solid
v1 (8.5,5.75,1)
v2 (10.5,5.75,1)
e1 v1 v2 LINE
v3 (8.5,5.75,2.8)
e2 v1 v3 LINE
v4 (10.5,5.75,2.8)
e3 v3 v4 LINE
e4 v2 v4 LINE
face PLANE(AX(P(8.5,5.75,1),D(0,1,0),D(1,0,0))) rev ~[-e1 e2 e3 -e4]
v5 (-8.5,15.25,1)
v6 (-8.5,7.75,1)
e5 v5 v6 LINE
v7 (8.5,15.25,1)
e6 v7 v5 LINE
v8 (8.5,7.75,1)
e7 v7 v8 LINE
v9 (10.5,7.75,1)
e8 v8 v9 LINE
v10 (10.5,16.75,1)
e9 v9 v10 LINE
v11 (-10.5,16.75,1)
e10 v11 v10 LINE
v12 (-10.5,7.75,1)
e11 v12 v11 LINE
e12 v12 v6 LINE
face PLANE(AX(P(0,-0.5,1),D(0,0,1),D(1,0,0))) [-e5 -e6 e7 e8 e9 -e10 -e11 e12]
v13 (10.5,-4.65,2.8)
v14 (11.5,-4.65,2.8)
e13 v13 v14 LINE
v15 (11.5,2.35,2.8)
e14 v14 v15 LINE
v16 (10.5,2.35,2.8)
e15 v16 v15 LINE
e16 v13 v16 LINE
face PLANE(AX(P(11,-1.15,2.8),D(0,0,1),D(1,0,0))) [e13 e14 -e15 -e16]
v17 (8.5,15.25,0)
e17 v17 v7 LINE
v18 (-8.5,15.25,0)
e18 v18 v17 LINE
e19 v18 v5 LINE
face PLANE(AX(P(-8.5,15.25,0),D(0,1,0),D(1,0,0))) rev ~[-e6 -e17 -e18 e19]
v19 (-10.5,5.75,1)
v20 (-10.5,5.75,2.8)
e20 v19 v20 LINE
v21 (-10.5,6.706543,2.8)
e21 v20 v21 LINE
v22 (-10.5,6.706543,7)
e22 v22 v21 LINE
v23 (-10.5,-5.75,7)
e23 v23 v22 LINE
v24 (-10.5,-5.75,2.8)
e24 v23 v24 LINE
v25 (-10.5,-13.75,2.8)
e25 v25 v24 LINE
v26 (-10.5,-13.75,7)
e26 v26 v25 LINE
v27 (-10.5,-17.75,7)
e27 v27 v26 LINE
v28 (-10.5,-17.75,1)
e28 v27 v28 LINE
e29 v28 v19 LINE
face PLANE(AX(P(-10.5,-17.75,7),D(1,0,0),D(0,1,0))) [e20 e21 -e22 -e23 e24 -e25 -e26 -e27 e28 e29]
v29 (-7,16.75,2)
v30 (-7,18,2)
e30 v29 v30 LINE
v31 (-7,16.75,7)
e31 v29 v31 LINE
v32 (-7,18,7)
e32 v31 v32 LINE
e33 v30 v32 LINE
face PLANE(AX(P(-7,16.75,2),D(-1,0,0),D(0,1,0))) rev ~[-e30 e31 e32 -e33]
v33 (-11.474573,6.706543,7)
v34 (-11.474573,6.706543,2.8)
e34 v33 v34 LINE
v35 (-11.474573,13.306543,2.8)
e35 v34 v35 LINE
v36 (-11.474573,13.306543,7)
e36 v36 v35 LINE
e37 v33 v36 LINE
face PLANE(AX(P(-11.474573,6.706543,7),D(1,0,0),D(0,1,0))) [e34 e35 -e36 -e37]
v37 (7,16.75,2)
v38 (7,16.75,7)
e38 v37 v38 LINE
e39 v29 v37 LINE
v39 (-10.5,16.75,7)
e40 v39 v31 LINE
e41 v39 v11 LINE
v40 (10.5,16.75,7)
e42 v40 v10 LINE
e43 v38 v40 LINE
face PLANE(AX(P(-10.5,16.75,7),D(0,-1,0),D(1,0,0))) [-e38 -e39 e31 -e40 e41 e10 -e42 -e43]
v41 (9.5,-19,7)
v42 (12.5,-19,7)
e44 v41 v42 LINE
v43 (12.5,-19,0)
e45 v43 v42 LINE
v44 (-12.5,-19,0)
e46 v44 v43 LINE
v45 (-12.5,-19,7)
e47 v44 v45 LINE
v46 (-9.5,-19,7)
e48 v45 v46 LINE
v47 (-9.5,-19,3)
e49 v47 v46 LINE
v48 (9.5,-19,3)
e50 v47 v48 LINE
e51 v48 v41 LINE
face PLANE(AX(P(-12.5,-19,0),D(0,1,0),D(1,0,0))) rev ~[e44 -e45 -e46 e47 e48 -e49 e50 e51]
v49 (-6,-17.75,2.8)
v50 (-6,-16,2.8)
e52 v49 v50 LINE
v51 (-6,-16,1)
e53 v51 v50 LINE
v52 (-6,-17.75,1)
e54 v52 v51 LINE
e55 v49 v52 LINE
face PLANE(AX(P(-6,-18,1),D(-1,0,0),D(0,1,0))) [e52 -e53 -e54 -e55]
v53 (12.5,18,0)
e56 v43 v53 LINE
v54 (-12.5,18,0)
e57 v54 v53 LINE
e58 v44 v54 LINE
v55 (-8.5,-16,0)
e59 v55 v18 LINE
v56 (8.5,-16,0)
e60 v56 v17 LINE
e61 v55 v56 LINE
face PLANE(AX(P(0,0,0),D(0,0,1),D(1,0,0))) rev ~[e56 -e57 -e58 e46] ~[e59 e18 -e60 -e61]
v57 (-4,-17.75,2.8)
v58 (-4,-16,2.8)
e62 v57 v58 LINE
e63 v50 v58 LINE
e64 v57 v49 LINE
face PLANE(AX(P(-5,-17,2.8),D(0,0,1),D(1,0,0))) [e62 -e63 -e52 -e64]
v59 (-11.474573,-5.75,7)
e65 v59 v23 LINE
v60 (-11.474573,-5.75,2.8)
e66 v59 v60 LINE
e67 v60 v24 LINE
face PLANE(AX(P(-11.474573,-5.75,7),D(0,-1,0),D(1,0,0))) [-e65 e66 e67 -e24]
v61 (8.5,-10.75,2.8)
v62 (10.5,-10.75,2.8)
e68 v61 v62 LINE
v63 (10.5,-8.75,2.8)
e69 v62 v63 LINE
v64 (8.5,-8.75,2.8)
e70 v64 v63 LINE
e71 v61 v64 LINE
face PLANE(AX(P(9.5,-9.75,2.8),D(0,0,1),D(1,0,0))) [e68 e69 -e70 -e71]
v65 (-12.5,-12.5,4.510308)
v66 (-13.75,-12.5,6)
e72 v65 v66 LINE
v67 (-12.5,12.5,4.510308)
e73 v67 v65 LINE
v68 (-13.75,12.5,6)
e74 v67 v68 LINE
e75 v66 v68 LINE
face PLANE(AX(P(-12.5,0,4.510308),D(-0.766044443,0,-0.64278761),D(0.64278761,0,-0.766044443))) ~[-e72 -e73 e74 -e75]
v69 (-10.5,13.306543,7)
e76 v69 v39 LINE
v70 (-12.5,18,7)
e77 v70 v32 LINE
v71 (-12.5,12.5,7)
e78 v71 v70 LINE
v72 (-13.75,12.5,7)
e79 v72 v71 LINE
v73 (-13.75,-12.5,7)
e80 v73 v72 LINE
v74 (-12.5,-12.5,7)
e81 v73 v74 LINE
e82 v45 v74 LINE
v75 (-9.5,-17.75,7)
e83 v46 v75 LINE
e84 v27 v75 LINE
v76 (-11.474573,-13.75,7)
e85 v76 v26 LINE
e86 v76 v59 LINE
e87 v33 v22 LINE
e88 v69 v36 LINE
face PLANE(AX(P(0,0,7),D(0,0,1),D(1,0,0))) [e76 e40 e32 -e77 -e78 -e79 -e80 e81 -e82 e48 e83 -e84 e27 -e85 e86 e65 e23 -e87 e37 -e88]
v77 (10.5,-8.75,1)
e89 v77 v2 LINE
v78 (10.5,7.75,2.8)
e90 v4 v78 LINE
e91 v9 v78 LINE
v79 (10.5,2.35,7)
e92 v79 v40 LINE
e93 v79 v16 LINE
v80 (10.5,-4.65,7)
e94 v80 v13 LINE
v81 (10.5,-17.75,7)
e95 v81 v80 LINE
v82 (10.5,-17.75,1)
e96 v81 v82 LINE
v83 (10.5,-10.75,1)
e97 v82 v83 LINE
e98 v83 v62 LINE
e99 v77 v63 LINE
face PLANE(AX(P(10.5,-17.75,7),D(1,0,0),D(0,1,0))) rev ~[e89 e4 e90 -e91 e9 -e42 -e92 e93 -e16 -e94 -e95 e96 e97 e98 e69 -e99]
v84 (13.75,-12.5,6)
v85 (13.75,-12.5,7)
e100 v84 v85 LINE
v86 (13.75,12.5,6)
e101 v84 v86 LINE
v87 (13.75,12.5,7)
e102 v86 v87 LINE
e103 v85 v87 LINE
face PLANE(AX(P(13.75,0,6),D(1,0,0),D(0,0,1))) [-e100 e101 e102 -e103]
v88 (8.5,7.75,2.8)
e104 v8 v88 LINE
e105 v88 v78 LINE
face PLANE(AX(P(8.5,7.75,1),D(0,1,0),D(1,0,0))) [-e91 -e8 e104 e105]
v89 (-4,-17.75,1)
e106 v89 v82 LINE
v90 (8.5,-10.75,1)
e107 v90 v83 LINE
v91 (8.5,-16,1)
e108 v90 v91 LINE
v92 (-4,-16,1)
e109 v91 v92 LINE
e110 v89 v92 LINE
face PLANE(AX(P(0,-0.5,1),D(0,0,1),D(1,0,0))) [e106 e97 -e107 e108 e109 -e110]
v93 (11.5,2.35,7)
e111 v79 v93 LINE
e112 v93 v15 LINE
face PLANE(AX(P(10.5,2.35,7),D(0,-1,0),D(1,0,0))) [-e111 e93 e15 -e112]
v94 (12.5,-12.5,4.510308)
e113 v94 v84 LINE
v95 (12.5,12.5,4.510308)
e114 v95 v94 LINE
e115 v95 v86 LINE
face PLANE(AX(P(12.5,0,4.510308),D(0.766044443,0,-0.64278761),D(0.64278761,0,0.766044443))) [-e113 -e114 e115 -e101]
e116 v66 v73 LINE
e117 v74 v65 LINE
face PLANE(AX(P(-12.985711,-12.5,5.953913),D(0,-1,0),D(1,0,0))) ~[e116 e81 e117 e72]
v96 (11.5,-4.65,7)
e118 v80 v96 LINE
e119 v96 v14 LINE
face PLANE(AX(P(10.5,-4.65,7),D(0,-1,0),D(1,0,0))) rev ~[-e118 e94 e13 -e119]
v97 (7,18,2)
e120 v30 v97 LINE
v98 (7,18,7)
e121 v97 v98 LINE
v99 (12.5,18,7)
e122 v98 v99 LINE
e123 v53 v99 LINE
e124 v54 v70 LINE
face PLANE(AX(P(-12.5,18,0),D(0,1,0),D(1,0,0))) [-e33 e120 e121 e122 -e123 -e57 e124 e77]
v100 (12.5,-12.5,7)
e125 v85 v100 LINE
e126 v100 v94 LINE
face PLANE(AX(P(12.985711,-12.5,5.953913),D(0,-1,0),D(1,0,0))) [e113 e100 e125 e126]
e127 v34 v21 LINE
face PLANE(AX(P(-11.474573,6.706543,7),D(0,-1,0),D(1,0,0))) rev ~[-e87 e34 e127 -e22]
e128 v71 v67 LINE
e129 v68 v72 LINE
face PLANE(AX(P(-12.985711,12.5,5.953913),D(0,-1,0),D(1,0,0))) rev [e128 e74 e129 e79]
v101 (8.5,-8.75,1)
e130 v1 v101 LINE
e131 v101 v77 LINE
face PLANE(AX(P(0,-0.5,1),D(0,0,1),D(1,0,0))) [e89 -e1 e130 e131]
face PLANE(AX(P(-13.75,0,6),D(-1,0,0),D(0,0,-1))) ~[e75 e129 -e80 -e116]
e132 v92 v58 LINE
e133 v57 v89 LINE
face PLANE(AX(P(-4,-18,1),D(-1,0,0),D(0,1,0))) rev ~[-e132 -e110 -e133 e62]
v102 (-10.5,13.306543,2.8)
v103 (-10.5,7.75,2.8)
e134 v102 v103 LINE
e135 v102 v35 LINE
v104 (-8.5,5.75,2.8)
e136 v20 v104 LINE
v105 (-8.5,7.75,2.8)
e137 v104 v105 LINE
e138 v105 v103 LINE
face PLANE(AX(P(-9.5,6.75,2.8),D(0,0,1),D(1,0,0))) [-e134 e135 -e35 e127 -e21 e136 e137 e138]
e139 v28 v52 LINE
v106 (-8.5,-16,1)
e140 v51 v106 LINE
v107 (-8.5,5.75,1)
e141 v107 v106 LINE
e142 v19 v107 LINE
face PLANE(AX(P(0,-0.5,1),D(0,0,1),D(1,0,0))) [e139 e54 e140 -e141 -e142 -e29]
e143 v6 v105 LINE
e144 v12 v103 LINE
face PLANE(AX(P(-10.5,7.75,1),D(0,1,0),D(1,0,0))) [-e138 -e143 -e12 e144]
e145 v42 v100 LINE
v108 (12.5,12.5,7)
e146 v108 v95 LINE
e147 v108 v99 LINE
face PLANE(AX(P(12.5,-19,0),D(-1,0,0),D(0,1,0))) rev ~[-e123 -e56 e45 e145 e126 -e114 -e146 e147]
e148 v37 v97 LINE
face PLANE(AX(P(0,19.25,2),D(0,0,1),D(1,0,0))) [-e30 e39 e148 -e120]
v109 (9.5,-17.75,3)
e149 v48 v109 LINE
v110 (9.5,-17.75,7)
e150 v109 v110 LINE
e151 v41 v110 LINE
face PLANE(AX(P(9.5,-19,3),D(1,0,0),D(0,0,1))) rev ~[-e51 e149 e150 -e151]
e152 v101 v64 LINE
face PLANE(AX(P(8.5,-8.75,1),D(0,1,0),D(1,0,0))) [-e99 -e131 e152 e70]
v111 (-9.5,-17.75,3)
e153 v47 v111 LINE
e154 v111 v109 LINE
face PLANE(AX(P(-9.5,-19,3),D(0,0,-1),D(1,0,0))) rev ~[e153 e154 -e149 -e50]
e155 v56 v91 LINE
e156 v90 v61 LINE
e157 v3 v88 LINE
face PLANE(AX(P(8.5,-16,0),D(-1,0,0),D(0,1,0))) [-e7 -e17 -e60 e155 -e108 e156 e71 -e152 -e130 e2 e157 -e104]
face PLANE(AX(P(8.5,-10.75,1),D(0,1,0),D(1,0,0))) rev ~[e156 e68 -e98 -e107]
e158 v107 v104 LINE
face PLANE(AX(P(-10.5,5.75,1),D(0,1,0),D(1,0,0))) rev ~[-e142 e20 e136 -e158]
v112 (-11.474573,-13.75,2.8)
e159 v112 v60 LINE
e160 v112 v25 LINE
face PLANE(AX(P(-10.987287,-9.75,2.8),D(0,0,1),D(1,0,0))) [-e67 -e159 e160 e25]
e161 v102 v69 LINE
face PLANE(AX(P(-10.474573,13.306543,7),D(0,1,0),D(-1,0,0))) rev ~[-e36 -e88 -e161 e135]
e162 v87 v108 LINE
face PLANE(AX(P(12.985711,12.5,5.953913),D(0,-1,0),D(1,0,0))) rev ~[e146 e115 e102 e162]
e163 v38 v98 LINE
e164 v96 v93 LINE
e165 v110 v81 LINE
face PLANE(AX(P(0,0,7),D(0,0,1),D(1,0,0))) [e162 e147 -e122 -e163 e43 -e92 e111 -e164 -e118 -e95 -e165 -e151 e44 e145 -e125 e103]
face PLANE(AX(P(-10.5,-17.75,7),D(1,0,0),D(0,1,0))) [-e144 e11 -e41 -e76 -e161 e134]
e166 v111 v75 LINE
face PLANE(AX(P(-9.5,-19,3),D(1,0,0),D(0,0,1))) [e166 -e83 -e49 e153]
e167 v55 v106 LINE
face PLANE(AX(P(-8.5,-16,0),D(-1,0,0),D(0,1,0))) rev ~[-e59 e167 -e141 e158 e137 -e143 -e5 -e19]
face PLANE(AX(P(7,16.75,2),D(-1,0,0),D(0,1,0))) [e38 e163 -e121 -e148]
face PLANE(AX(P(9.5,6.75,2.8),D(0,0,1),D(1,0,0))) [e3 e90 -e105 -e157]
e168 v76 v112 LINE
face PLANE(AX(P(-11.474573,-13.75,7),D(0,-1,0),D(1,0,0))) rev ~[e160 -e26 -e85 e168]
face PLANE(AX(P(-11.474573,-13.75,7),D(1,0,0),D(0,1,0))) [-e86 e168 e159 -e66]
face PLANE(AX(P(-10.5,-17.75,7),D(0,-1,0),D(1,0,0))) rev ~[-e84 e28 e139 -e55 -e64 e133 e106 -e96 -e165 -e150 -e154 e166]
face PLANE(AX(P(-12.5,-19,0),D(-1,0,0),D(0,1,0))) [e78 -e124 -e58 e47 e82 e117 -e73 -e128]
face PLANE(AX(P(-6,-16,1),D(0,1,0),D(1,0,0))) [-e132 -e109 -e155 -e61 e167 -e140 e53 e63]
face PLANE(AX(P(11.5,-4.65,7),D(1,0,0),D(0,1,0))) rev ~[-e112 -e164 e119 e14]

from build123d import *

# Parameters (mm, degrees)
F0_W      = 25
F0_H      = 38
F1_DEPTH  = 7
F2_W      = 21
F2_H      = 34.5
F3_DEPTH  = 6
F4_W      = 2
F4_H      = 2
F5_DEPTH  = 1.8
F6_W      = 17
F6_H      = 31.25
F7_DEPTH  = 7.001
F8_W      = 0.0254269466
F8_H      = 6.6
F8_W_2    = 0.9745730534
F8_W_3    = 1
F8_H_2    = 7
F8_H_3    = 8
F9_DEPTH  = 4.2
F11_W     = 14
F11_H     = 5
F12_DEPTH = 5
F13_DEPTH = 1
F15_DEPTH = 12.5
F16_W     = 19
F16_H     = 4
F17_DEPTH = 3


# Not quite as in the source:
# - a pattern or mirror of a feature is missing from the dataset's text; its kind, count and spacing are read off the source's solid
# - a feature names something its author has since deleted; it is built from what else it names


with BuildPart() as f1:
    # F0 (on Top) → F1 (new body)
    with BuildSketch(Plane.XY):
        Rectangle(F0_W, F0_H)
    extrude(amount=F1_DEPTH)

    # F2 (on face) → F3 (cut)
    with BuildSketch(Plane.XY.offset(7)):
        with Locations((0, -0.5)):
            Rectangle(F2_W, F2_H)
    extrude(amount=-F3_DEPTH, mode=Mode.SUBTRACT)

    # F4 (on face) → F5 (join)
    with BuildSketch(Plane.XY.offset(1)):
        with Locations((-9.5, 6.75)):
            Rectangle(F4_W, F4_H)
        with Locations((9.5, 6.75)):
            Rectangle(F4_W, F4_H)
        with Locations((9.5, -9.75)):
            Rectangle(F4_W, F4_H)
        with Locations((-5, -17)):
            Rectangle(F4_W, F4_H)
    extrude(amount=F5_DEPTH)

    # F6 (on Top) → F7 (cut, through all)
    with BuildSketch(Plane.XY):
        with Locations((0, -0.375)):
            Rectangle(F6_W, F6_H)
    extrude(amount=F7_DEPTH, mode=Mode.SUBTRACT)

    # F8 (on face) → F9 (cut, through all)
    with BuildSketch(Plane.XY.offset(7)):
        with Locations((-10.4872865267, 10.0065428064)):
            Rectangle(F8_W, F8_H)
        with Locations((-10.9872865267, 10.0065428064)):
            Rectangle(F8_W_2, F8_H)
        with Locations((11, -1.15)):
            Rectangle(F8_W_3, F8_H_2)
        with Locations((-10.9872865267, -9.75)):
            Rectangle(F8_W_2, F8_H_3)
    extrude(amount=-F9_DEPTH, mode=Mode.SUBTRACT)

    # F11 (on offset) → F12 (cut)
    with BuildSketch(Plane.XY.offset(2)):
        with Locations((0, 19.25)):
            Rectangle(F11_W, F11_H)
    extrude(amount=F12_DEPTH, mode=Mode.SUBTRACT)

    # F13 (cut): a face of the model
    f13_faces = [f1.faces().sort_by_distance(p)[0] for p in [
        (0, 19, 0.2596150997),
    ]]
    extrude(f13_faces, amount=-F13_DEPTH, mode=Mode.SUBTRACT)

    # F14 (on Front) → F15 (join, symmetric)
    with BuildSketch(Plane.XZ):
        Polygon((13.75, 7), (12.5, 7), (12.5, 4.5103080093), (13.75, 6), align=None)
    f15 = extrude(amount=F15_DEPTH, both=True)

    # F15_copies: F15 across plane
    add(f15.mirror(Plane(origin=(0, 0, 0), x_dir=(0, 0, -1), z_dir=(-1, 0, 0))))

    # F16 (on face) → F17 (cut)
    with BuildSketch(Plane.XZ.offset(19)):
        with Locations((0, 5)):
            Rectangle(F16_W, F16_H)
    extrude(amount=-F17_DEPTH, mode=Mode.SUBTRACT)


solid = f1.part
